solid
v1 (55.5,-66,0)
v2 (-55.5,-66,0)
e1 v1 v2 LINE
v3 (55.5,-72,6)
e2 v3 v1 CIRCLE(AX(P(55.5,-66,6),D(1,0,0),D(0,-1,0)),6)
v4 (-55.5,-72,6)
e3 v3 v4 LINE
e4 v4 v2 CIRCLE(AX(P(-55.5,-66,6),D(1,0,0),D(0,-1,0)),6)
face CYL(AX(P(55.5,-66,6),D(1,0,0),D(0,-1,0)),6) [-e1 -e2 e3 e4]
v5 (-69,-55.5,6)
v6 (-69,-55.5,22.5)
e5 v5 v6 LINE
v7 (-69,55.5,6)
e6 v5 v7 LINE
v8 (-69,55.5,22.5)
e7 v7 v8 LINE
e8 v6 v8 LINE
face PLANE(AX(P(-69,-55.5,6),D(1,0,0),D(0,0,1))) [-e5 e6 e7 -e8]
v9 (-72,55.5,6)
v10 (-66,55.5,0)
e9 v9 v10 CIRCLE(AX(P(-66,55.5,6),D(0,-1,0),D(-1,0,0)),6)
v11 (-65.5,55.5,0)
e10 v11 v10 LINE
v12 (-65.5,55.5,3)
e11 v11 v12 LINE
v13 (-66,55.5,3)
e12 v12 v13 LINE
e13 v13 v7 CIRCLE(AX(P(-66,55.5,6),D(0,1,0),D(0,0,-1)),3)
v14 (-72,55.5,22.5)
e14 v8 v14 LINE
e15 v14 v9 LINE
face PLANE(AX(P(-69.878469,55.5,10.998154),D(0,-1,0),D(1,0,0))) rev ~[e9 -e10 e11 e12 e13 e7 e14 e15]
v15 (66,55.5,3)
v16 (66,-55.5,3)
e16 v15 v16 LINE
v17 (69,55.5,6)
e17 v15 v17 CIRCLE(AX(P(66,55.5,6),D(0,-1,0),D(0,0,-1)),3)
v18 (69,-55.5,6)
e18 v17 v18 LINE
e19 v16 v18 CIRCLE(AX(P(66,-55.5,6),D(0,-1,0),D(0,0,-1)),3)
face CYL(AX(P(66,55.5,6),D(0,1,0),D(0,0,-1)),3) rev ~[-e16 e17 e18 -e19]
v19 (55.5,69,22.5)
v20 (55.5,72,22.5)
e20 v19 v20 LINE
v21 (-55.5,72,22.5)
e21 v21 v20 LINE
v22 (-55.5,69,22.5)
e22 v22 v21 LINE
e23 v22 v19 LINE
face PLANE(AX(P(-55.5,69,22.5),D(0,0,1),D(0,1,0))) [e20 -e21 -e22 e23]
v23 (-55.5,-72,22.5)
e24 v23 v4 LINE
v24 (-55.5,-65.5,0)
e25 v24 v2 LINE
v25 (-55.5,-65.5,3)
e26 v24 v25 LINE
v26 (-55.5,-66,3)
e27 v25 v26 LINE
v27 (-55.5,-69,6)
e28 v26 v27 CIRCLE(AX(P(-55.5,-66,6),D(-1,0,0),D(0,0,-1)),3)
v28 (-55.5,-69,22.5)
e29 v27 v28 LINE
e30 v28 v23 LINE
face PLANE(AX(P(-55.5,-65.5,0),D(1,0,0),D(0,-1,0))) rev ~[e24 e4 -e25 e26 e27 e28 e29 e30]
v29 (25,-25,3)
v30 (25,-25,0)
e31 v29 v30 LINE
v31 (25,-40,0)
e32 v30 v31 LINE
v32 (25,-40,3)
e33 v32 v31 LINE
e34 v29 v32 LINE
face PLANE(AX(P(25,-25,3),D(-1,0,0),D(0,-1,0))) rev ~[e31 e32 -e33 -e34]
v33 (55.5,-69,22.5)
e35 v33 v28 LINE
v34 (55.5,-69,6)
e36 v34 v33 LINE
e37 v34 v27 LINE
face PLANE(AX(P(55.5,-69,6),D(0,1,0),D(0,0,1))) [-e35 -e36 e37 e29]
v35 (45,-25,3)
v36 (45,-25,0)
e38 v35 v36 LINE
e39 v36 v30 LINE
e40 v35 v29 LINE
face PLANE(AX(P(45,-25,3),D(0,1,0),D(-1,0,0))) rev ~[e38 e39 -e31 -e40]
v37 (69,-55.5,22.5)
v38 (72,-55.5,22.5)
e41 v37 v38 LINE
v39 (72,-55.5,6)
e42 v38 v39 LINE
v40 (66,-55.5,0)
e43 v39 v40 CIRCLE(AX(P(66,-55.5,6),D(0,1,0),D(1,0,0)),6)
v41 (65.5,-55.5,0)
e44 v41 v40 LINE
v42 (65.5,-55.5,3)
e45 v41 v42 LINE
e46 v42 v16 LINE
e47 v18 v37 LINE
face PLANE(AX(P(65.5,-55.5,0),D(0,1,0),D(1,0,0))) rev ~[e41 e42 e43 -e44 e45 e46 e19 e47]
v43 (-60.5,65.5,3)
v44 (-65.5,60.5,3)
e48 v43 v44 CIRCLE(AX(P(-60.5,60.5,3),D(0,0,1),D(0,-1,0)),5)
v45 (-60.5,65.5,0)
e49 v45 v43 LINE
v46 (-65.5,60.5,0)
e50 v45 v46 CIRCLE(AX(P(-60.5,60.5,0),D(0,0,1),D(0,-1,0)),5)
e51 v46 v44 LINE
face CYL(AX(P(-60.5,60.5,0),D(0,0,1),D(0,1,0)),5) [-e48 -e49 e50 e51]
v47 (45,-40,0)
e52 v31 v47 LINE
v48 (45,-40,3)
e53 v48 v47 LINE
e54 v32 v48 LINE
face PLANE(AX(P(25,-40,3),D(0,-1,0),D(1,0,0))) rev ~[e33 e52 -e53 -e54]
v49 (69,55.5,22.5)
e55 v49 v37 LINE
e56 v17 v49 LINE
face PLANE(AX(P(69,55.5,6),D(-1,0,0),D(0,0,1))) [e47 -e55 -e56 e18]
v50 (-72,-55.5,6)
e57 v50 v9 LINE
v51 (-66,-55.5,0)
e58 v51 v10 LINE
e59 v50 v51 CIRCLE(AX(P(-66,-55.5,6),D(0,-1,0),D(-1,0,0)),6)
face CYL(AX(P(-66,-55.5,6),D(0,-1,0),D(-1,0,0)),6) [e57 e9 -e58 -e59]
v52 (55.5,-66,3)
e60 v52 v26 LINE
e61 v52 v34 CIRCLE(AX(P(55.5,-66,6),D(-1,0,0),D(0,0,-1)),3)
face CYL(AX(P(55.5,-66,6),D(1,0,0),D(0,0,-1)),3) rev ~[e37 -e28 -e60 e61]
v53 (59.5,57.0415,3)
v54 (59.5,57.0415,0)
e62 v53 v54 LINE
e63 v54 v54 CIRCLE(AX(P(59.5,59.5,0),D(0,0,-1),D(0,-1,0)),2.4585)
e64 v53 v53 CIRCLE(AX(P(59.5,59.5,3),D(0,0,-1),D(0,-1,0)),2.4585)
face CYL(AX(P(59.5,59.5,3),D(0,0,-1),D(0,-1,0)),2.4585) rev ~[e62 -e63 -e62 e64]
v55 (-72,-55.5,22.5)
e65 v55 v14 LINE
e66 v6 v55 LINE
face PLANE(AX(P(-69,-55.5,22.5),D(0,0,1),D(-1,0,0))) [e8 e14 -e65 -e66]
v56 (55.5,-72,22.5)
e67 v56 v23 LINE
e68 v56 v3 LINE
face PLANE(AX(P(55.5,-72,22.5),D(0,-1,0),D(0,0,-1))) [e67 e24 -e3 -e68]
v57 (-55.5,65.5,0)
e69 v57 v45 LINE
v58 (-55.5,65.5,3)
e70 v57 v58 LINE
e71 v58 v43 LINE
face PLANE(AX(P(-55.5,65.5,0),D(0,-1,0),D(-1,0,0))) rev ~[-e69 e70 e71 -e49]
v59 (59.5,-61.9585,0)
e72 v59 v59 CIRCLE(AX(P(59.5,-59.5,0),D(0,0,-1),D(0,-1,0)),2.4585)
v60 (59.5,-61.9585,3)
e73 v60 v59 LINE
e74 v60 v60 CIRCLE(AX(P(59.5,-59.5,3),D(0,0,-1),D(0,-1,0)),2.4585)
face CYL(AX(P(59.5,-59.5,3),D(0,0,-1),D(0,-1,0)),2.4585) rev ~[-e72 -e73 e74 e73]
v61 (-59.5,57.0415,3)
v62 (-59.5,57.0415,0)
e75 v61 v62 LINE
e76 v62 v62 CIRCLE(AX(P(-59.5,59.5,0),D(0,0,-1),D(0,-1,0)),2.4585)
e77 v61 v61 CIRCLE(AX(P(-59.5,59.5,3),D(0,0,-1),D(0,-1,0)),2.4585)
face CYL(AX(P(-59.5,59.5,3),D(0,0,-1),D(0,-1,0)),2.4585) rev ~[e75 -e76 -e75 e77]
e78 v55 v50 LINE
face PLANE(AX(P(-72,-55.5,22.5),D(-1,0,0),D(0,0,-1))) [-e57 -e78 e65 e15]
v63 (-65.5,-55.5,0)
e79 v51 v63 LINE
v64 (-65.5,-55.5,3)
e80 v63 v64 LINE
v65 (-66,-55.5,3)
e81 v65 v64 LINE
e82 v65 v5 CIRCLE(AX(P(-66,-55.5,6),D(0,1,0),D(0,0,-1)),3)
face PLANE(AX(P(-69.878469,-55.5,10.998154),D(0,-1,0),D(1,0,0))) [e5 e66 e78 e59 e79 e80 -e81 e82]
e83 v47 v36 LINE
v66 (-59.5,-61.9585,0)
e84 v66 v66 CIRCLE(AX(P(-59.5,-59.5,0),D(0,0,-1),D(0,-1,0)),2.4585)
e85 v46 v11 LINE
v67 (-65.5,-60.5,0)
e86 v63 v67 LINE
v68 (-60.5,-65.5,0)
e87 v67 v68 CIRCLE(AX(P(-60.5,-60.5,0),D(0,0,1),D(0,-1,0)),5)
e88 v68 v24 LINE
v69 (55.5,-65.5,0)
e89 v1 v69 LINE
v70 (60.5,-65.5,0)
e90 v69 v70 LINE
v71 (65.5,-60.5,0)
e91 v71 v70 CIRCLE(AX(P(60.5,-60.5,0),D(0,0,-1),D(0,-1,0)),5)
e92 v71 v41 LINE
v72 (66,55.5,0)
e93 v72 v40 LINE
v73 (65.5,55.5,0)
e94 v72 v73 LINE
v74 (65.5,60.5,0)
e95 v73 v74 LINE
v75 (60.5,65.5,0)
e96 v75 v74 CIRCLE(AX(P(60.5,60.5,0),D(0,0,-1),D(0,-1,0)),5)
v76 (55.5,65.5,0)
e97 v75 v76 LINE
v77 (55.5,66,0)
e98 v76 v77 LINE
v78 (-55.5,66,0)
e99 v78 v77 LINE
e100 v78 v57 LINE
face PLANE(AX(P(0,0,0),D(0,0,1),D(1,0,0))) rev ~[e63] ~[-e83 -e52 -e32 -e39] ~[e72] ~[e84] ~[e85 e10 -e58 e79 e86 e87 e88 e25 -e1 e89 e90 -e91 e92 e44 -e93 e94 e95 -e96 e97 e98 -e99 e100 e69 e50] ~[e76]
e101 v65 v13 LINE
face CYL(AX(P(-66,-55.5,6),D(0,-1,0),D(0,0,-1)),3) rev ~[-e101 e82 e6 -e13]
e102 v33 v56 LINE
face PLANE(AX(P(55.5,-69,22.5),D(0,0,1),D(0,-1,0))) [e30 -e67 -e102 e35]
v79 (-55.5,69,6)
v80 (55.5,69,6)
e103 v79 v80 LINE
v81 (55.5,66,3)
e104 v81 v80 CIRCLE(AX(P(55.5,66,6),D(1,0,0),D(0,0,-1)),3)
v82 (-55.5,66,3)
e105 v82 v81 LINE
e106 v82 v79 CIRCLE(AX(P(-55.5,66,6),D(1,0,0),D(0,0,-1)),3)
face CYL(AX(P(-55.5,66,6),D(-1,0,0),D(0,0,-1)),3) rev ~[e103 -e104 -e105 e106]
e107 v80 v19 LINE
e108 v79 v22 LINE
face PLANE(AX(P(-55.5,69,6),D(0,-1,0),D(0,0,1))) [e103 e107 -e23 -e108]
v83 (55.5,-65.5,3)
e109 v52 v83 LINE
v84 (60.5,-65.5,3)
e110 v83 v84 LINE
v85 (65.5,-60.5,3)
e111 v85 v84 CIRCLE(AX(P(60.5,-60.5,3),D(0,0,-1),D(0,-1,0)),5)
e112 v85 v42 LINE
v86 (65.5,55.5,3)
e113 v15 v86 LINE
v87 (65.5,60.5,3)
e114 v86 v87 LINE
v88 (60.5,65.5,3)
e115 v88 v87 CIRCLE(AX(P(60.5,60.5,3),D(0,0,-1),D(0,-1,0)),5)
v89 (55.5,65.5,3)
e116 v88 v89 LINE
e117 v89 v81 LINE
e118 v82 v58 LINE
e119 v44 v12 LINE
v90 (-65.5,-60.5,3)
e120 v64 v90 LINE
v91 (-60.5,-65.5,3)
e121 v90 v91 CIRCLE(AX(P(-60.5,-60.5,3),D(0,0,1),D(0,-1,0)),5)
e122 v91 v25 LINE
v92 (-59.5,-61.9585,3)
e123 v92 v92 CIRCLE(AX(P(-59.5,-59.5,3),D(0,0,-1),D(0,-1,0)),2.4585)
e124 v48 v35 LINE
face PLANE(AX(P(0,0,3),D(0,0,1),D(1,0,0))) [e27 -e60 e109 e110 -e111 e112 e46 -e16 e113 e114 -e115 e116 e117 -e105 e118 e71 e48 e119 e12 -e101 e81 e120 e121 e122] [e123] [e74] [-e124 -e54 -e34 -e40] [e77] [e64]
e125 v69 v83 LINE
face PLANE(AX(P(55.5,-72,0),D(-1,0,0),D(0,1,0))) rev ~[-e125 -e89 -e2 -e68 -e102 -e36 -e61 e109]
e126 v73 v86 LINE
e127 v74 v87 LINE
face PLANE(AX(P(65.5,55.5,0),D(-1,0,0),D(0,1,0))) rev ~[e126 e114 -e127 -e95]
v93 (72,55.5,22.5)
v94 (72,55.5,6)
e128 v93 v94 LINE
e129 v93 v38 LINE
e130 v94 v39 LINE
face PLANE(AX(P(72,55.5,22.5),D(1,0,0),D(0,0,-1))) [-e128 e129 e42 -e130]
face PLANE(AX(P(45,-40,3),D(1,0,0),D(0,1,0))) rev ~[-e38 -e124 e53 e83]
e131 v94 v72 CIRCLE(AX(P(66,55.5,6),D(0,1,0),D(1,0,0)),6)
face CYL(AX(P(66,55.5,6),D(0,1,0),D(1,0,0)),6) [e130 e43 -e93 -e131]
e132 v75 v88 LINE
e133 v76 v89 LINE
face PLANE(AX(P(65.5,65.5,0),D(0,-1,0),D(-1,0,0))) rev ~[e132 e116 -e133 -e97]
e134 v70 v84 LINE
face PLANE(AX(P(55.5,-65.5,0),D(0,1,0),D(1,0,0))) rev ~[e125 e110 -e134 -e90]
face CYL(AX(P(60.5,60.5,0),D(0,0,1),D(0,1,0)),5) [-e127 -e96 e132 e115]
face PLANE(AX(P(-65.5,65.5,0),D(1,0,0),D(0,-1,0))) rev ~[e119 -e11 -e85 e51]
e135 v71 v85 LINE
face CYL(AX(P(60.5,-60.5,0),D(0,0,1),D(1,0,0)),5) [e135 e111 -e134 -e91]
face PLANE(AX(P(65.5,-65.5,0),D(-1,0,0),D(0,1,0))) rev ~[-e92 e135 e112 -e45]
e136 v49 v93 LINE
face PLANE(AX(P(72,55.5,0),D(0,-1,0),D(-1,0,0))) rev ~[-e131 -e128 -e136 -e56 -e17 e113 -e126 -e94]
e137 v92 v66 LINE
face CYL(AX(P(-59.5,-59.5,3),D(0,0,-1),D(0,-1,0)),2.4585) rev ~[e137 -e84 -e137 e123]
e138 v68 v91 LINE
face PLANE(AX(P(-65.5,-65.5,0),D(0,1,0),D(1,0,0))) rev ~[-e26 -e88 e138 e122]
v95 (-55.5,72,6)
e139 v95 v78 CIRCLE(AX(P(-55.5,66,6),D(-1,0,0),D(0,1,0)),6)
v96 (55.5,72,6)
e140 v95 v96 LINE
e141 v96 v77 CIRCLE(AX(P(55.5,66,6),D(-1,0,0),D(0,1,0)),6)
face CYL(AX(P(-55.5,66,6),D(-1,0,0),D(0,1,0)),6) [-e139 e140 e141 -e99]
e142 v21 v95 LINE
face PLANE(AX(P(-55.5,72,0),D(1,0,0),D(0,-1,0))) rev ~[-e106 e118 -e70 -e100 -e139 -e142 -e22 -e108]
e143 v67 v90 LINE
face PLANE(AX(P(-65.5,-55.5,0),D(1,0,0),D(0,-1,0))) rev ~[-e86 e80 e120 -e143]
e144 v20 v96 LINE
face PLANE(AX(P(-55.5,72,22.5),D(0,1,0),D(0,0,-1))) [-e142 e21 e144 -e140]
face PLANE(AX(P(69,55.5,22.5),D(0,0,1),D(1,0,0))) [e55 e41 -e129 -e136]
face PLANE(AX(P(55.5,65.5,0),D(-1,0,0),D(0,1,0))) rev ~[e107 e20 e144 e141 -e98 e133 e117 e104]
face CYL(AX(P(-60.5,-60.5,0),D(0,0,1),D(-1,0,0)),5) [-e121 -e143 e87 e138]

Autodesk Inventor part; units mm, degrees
ref_plane "YZ Plane" through (0, 0, 0) normal (1, 0, 0) x (0, 1, 0)
ref_plane "XZ Plane" through (0, 0, 0) normal (0, 1, 0) x (-1, 0, 0)
ref_plane "XY Plane" through (0, 0, 0) normal (0, 0, 1) x (1, 0, 0)
sketch "Sketch1" plane through (0, 0, 0) normal (0, 0, 1) x (1, 0, 0)
  line L0 (55.5, 72) -> (-55.5, 72)
  line L1 (-55.5, 72) -> (-55.5, 65.5)
  line L2 (-55.5, 65.5) -> (-65.5, 65.5)
  line L3 (-65.5, 65.5) -> (-65.5, 55.5)
  line L4 (-65.5, 55.5) -> (-72, 55.5)
  line L5 (-72, 55.5) -> (-72, -55.5)
  line L6 (-72, -55.5) -> (-65.5, -55.5)
  line L7 (-65.5, -55.5) -> (-65.5, -65.5)
  line L8 (-65.5, -65.5) -> (-55.5, -65.5)
  line L9 (-55.5, -65.5) -> (-55.5, -72)
  line L10 (-55.5, -72) -> (55.5, -72)
  line L11 (55.5, -72) -> (55.5, -65.5)
  line L12 (55.5, -65.5) -> (65.5, -65.5)
  line L13 (65.5, -65.5) -> (65.5, -55.5)
  line L14 (65.5, -55.5) -> (72, -55.5)
  line L15 (72, -55.5) -> (72, 55.5)
  line L16 (72, 55.5) -> (65.5, 55.5)
  line L17 (65.5, 55.5) -> (65.5, 65.5)
  line L18 (65.5, 65.5) -> (55.5, 65.5)
  line L19 (55.5, 65.5) -> (55.5, 72)
  point P0 (0, 0)
  dimension "d5" = 144
  dimension "d14" = 144
  dimension "d15" = 72
  dimension "d16" = 72
  dimension "d28" = 10
  dimension "d30" = 10
  dimension "d31" = 10
  dimension "d32" = 111
  dimension "d33" = 111
extrude "Plate1" add sketch "Sketch1" along normal blind 3
sketch "Sketch2" plane through (-69, -55.5, 0) normal (-1, 0, 0) x (0, -1, 0)
  line L0 (-111, 0) -> (0, 0)
  line L1 (0, 0) -> (0, 22.5)
  line L2 (0, 22.5) -> (-111, 22.5)
  line L3 (-111, 22.5) -> (-111, 0)
edge flange "Flange1" height 22.5 angle 90 thickness 3 bend radius 3 thickness toward (-1, 0, 0) relief tear relief width 3 relief depth 0 corner gap 3 corner form 0 edges at (-72, 0, 3) (0, -72, 3) (72, 0, 3) (0, 72, 3) wall of the first edge with corners at (-69, 55.5, 0) (-69, -55.5, 0) (-69, -55.5, 22.5) (-69, 55.5, 22.5)
bend "Bend1"
corner "Corner1"
sketch "Sketch3" plane through (0, 0, 3) normal (0, 0, 1) x (1, 0, 0)
  line L0 (59.5, -59.5) -> (-59.5, -59.5)
  line L1 (-59.5, -59.5) -> (-59.5, 59.5)
  line L2 (-59.5, 59.5) -> (59.5, 59.5)
  line L3 (59.5, 59.5) -> (59.5, -59.5)
  circle A0 centre (59.5, -59.5) radius 3
  point P0 (0, 0)
  dimension "d34" = 119
  dimension "d35" = 119
  dimension "d36" = 59.5
  dimension "d37" = 59.5
  dimension "d38" = 6
hole "Hole1" at (59.5, -59.5, 3) at (-59.5, -59.5, 3) at (-59.5, 59.5, 3) at (59.5, 59.5, 3) direction (0, 0, -1) diameter 4.917 end through all thread size "M6x1" class "6H" standard "ISO Metric profile"
fillet "Corner Round1" radius 5 4 edges at (65.5, -65.5, 1.5) (65.5, 65.5, 1.5) (-65.5, 65.5, 1.5) (-65.5, -65.5, 1.5)
sketch "Sketch4" plane through (0, 0, 3) normal (0, 0, 1) x (1, 0, 0)
  line L0 (45, -25) -> (25, -25)
  line L1 (25, -25) -> (25, -40)
  line L2 (25, -40) -> (45, -40)
  line L3 (45, -40) -> (45, -25)
  point P0 (0, 0)
  dimension "d47" = 20
  dimension "d48" = 15
  dimension "d49" = 25
  dimension "d50" = 25
extrude "Cut1" cut sketch "Sketch4" against normal blind 3
equation "\"d36\" = 0.5 * d34"
equation "\"d37\" = 0.5 * d35"
equation "\"d40\" = Thickness"
equation "\"d44\" = Thickness"
equation "\"d51\" = Thickness"
equation "\"d17\" = Thickness"
equation "\"d18\" = BendReliefWidth"
equation "\"d20\" = MinimumRemnant"
equation "\"d21\" = TransitionRadius"
equation "\"d24\" = BendRadius"
equation "\"d25\" = CornerReliefSize"
equation "\"d26\" = GapSize"
equation "\"d27\" = JacobiRadiusSize"
equation "\"d15\" = 0.5 * d5"
equation "\"d16\" = 0.5 * d14"
equation "\"BendRadius\" = Thickness"
equation "\"BendReliefWidth\" = Thickness"
equation "\"BendReliefDepth\" = 0.5 * Thickness"
equation "\"CornerReliefSize\" = 4 * Thickness"
equation "\"MinimumRemnant\" = 2 * Thickness"
equation "\"TransitionRadius\" = BendRadius"
equation "\"JacobiRadiusSize\" = BendRadius"
equation "\"GapSize\" = Thickness"
equation "\"Thickness\" = 3"
properties part number "WaageBlechUnterseite"
